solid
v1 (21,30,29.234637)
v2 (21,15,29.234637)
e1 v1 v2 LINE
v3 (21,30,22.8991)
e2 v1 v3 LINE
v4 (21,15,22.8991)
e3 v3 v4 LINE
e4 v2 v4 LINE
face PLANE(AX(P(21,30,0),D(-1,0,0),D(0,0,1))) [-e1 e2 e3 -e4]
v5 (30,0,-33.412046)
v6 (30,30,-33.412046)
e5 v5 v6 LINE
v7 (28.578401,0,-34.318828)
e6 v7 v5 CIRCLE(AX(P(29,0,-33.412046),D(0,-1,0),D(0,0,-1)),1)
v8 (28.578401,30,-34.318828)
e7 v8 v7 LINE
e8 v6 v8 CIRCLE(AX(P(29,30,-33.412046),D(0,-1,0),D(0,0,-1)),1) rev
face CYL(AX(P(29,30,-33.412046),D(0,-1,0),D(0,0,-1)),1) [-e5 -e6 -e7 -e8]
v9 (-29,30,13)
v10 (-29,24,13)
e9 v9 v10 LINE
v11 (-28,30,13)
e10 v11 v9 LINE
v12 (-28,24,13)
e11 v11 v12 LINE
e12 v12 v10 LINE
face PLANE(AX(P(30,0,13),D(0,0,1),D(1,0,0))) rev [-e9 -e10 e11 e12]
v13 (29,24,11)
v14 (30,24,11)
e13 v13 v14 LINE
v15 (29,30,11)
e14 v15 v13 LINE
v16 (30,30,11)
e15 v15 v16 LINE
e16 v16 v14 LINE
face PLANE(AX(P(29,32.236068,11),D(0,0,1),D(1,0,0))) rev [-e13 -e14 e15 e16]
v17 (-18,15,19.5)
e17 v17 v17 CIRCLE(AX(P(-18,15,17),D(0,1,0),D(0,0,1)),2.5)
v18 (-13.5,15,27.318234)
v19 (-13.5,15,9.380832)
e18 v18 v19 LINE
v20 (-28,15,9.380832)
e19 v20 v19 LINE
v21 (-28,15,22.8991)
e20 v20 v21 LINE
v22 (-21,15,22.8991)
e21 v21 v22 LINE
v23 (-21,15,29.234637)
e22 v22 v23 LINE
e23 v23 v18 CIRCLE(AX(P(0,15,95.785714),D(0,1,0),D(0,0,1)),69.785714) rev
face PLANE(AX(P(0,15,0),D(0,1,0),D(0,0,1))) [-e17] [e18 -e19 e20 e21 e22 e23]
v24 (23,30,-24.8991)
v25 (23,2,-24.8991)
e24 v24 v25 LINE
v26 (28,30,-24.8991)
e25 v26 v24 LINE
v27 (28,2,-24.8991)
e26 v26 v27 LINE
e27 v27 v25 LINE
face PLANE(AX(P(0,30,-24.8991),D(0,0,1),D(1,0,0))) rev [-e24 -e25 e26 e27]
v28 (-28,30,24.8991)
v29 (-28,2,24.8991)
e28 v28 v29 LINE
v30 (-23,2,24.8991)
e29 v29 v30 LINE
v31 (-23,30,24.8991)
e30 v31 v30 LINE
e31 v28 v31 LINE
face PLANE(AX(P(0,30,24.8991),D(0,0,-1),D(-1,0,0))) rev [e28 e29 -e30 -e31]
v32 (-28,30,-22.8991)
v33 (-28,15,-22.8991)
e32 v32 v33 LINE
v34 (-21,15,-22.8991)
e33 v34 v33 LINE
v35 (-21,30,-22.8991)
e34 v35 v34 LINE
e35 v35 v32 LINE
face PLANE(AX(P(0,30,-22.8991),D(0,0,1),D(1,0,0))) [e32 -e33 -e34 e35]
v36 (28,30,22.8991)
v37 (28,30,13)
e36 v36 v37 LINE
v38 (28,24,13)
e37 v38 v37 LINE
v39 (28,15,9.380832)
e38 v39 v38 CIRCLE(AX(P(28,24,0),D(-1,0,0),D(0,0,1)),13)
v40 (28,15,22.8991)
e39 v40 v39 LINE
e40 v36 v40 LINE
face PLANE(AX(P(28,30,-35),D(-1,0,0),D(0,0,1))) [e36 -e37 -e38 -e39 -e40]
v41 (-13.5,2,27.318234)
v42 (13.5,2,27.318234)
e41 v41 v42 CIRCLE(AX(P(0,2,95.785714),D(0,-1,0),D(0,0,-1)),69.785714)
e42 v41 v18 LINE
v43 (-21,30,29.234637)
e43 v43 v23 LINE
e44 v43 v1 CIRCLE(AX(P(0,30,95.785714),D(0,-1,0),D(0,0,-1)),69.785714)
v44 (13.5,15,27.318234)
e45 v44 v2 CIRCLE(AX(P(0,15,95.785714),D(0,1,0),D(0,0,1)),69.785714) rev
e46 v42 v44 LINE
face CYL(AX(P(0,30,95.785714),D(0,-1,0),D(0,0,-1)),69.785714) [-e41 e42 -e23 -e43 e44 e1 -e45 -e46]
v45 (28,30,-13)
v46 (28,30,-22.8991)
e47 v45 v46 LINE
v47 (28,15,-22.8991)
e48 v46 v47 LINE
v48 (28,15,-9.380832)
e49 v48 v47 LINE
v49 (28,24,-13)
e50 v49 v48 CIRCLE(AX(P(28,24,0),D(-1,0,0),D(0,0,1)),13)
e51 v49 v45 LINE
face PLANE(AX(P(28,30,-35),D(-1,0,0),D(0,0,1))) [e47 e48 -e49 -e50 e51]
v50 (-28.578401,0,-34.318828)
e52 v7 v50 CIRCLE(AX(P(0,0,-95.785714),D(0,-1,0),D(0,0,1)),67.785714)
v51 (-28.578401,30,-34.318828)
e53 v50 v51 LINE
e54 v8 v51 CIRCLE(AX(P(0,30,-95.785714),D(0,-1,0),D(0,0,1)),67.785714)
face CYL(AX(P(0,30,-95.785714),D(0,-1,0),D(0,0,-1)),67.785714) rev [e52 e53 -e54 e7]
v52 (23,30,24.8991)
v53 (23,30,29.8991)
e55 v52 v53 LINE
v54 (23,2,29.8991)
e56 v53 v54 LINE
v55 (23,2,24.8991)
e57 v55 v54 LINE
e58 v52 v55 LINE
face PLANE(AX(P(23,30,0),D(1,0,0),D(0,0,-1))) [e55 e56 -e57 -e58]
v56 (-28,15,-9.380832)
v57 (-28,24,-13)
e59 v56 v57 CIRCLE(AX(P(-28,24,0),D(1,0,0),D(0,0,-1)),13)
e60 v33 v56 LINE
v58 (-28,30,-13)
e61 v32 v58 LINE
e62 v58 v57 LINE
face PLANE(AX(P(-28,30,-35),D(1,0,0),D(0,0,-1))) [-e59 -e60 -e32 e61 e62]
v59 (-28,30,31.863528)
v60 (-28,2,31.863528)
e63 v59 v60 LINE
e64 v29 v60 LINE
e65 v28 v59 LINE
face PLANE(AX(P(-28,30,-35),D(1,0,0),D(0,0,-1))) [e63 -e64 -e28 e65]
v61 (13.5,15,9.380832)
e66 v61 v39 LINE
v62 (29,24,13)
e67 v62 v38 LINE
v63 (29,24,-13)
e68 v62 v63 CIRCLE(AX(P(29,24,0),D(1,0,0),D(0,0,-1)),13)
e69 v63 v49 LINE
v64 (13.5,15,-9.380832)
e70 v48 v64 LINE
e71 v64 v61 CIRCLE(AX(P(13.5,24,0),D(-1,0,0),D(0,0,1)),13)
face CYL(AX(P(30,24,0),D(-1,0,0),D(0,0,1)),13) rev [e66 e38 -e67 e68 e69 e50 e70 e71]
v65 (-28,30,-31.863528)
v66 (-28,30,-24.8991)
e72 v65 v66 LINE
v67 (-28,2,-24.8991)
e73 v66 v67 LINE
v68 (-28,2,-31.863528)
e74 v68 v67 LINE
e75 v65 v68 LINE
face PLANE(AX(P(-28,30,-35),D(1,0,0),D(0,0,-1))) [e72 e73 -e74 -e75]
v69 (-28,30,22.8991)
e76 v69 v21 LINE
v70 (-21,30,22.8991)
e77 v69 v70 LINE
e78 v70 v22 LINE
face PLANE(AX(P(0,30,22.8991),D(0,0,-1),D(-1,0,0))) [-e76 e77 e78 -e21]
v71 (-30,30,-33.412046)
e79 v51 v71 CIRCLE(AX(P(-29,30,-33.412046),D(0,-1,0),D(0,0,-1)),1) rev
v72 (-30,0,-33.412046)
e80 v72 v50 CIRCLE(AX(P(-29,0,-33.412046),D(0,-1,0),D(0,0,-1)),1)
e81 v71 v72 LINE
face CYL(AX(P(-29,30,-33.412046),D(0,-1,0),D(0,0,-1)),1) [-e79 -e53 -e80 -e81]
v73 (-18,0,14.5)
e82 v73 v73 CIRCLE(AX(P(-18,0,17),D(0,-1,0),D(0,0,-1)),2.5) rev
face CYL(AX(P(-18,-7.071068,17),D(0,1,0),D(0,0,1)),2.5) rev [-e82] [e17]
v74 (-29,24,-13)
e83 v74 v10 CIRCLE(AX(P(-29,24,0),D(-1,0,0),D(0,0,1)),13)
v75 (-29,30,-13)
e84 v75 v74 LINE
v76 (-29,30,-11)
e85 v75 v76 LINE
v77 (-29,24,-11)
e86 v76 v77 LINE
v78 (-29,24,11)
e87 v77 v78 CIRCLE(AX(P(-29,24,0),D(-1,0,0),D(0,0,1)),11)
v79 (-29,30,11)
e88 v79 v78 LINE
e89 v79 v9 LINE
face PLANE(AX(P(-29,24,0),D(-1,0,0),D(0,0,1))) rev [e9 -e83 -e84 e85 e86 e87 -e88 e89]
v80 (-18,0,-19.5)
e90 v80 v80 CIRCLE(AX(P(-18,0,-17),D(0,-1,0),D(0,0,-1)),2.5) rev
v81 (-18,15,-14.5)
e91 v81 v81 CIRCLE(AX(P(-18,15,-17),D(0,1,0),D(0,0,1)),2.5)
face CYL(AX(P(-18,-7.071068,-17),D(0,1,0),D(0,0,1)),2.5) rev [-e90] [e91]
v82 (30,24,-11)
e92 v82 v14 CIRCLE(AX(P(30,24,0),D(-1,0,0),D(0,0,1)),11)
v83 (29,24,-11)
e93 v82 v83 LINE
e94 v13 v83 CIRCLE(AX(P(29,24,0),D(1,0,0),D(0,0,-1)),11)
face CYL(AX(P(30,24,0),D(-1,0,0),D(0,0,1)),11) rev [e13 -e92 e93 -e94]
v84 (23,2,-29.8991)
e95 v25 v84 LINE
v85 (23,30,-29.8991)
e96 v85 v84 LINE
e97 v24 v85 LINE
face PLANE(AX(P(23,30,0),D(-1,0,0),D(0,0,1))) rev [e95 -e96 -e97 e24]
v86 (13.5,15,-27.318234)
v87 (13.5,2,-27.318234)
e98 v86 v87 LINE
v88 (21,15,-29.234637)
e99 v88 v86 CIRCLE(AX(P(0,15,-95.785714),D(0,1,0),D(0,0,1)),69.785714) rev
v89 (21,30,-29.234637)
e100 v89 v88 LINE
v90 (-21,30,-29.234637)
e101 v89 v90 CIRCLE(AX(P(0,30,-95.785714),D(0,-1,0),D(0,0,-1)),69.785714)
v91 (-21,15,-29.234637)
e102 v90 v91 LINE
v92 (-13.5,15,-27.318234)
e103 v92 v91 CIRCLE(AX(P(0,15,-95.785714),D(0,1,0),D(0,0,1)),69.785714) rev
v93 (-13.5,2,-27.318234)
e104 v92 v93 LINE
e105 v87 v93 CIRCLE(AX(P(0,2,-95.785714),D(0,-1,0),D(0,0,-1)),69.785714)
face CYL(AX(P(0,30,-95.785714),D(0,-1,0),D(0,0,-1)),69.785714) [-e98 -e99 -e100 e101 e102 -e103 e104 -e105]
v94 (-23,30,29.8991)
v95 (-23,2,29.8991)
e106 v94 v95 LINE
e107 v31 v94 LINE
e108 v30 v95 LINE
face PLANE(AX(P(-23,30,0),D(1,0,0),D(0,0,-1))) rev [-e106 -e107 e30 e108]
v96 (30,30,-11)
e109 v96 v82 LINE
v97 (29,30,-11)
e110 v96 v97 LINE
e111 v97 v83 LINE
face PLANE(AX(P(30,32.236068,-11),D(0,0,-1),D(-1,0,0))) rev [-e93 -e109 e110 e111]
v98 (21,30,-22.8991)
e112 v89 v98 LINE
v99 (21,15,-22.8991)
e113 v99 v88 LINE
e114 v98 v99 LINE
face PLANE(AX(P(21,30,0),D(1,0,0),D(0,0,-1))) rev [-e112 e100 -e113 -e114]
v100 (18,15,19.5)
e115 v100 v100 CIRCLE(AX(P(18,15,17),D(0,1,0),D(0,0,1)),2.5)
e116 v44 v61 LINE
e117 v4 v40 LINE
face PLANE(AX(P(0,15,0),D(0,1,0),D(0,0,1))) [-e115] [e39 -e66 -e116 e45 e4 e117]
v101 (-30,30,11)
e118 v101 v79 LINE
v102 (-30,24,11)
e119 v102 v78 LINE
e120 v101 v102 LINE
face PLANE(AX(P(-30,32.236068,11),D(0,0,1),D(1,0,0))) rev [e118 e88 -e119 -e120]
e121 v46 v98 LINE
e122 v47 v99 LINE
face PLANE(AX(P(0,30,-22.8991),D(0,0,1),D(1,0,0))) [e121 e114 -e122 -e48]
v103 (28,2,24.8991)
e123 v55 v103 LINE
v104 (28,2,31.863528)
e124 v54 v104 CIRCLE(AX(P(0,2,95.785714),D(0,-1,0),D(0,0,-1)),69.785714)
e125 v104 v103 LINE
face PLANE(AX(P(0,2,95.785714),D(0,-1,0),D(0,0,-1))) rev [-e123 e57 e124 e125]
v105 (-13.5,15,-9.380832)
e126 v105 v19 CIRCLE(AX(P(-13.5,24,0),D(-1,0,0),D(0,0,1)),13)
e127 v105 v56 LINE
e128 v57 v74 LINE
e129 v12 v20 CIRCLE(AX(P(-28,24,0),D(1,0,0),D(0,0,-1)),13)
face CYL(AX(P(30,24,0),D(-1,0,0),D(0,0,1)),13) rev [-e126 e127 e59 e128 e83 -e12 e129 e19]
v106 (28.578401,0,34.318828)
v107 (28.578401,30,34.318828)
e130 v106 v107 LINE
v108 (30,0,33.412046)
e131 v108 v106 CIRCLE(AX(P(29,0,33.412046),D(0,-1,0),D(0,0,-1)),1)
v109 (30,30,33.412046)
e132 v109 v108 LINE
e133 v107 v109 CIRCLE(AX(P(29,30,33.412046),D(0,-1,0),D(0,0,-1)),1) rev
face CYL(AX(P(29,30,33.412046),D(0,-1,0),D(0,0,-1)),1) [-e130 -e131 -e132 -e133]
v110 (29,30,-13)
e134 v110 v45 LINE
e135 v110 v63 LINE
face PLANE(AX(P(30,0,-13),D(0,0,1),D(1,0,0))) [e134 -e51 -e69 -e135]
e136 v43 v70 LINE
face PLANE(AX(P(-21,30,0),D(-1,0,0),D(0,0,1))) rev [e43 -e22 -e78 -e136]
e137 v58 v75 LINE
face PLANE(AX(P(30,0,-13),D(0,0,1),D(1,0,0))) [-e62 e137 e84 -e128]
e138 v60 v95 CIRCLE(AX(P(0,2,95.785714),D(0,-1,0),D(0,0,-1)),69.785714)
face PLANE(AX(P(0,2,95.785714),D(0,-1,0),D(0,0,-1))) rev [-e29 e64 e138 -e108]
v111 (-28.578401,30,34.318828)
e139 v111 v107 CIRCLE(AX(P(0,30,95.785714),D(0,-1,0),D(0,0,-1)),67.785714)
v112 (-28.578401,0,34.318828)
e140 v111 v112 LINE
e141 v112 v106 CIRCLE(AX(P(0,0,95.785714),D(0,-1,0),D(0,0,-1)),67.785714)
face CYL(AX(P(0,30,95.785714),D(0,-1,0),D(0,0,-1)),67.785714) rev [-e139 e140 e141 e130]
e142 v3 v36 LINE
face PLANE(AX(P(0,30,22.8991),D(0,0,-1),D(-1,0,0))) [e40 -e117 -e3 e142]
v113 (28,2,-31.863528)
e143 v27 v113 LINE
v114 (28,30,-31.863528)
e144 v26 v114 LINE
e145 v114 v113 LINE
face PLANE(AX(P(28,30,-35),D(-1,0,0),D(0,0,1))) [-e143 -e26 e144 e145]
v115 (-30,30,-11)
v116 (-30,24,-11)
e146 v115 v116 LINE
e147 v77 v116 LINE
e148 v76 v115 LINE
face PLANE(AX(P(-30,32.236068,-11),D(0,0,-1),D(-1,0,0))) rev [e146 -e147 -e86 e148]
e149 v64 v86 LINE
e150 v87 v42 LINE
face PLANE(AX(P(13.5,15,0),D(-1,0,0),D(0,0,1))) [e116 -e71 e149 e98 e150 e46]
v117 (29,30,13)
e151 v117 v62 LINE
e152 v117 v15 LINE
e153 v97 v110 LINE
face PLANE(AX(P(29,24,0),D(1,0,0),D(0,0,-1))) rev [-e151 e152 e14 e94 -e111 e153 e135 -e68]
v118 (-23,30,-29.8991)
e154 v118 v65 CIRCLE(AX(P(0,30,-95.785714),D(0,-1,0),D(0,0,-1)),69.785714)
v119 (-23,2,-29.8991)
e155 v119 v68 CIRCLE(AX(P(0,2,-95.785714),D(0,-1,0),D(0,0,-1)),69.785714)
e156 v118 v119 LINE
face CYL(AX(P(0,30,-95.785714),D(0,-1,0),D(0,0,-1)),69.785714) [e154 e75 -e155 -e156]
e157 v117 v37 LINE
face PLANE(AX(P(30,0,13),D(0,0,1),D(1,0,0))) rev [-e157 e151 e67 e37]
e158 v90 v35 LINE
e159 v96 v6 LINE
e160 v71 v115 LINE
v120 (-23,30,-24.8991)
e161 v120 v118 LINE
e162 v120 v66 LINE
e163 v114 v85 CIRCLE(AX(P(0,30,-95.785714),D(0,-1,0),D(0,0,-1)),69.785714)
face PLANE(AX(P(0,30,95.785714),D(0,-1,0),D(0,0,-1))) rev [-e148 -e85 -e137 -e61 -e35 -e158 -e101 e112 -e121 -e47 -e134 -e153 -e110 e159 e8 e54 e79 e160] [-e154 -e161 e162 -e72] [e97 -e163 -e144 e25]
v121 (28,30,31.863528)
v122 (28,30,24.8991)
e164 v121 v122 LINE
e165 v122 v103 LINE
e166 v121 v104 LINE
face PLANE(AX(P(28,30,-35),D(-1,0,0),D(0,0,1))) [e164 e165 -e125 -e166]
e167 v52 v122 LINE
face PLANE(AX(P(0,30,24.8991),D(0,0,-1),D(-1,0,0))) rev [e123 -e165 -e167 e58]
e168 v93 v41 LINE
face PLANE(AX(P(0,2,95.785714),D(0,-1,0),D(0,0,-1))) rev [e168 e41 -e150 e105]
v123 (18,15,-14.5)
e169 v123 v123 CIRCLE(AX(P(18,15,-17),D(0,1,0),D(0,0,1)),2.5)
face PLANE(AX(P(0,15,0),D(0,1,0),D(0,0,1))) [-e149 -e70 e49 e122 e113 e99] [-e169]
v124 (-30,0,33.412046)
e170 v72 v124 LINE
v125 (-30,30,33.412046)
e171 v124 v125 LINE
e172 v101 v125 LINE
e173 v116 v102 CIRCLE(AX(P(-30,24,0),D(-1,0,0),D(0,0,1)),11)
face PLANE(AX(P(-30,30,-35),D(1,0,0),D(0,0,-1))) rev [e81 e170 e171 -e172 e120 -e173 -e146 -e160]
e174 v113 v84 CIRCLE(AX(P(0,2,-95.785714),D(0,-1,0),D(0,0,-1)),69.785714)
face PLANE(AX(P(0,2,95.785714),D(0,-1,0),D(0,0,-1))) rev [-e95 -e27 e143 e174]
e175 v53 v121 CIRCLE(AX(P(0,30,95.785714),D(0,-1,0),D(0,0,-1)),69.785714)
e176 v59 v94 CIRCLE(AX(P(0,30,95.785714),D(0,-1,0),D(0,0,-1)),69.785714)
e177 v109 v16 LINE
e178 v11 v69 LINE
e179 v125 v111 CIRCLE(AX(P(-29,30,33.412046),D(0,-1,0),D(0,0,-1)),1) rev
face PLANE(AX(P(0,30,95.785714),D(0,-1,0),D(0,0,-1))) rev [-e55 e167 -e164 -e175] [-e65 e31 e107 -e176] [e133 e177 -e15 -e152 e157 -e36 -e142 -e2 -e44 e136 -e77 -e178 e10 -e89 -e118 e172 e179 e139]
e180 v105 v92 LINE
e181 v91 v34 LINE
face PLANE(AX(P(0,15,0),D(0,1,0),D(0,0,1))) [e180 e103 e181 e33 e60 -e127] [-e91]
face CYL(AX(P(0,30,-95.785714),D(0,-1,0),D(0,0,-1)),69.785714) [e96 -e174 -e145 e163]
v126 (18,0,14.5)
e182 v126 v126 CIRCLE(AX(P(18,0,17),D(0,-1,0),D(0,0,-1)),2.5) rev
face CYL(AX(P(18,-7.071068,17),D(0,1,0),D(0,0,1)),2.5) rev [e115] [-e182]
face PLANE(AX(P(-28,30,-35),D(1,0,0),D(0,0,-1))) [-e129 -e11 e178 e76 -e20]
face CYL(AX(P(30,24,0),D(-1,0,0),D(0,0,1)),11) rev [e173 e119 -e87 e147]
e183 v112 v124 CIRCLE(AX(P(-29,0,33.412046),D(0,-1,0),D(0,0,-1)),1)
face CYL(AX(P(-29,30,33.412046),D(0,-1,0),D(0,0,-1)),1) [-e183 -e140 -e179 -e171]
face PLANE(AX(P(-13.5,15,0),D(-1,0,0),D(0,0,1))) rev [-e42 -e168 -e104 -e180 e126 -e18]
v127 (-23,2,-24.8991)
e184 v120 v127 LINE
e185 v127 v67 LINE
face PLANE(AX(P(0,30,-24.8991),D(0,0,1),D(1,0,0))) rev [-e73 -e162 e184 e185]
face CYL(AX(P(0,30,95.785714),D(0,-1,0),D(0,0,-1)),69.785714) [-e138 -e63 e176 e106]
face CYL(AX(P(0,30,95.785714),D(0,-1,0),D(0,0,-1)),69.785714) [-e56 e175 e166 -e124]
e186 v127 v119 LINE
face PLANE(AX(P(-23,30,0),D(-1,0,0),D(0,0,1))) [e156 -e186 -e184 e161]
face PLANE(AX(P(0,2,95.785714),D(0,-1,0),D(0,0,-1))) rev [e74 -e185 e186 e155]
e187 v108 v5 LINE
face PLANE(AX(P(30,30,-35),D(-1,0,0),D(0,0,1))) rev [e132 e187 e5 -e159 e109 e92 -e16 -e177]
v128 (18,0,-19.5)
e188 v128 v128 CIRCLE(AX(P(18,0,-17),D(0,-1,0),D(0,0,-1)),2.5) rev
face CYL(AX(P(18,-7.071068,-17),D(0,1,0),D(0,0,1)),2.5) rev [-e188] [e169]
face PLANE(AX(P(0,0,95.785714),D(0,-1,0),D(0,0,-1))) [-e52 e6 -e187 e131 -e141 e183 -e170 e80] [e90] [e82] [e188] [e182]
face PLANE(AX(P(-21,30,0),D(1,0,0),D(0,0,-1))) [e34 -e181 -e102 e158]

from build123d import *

# Parameters (mm, degrees)
RESSALTO_EXTRUS_O2_DEPTH = 30
CASCA1_T                 = -2
RESSALTO_EXTRUS_O3_DEPTH = 28
RESSALTO_EXTRUS_O4_DEPTH = 13
CASCA2_START             = 2
CASCA2_DEPTH             = 13
RESSALTO_EXTRUS_O5_DEPTH = 13
RESSALTO_EXTRUS_O6_DEPTH = 13
CORTE_EXTRUS_O1_DEPTH    = 60
RESSALTO_EXTRUS_O7_DEPTH = 1
RESSALTO_EXTRUS_O8_START = -1
RESSALTO_EXTRUS_O8_DEPTH = 1
ESBO_O16_R               = 11
CORTE_EXTRUS_O2_DEPTH    = 60
ESBO_O17_R               = 2.5
CORTE_EXTRUS_O3_DEPTH    = 15
FILETE1_R                = 1
ESBO_O18_W               = 1
ESBO_O18_H               = 2
RESSALTO_EXTRUS_O9_DEPTH = 6


# Read off the part's stored shape, not the designer's step: Casca2, Ressalto-extrusão5, Ressalto-extrusão6
with BuildPart() as part:
    # Esboço2 → Ressalto-extrusão2 (new body)
    with BuildSketch(Plane(origin=(0, 0, 0), x_dir=(1, 0, 0), z_dir=(0, 1, 0))):
        with BuildLine():
            Line((-30, 35), (-30, -35))
            ThreePointArc((-30, -35), (0, -28), (30, -35))
            Line((30, -35), (30, 35))
            ThreePointArc((30, 35), (0, 28), (-30, 35))
        make_face()
    extrude(amount=RESSALTO_EXTRUS_O2_DEPTH)

    # Casca1
    casca1_openings = [part.faces().sort_by_distance(p)[0] for p in [
        (0, 30, 0),
    ]]
    offset(amount=CASCA1_T, openings=casca1_openings, kind=Kind.INTERSECTION)

    # Esboço5 → Ressalto-extrusão3 (add)
    with BuildSketch(Plane(origin=(0, 2, 0), x_dir=(1, 0, 0), z_dir=(0, 1, 0))):
        with BuildLine():
            Line((28, 22.89910018), (28, 24.89910018))
            Line((28, 24.89910018), (23, 24.89910018))
            Line((23, 24.89910018), (23, 29.89910018))
            ThreePointArc((23, 29.89910018), (22.002508446, 29.559318185), (21, 29.234636771))
            Line((21, 29.234636771), (21, 22.89910018))
            Line((21, 22.89910018), (28, 22.89910018))
        make_face()
        with BuildLine():
            ThreePointArc((-23, -29.89910018), (-22.002508446, -29.559318185), (-21, -29.234636771))
            Line((-21, -29.234636771), (-21, -22.89910018))
            Line((-21, -22.89910018), (-28, -22.89910018))
            Line((-28, -22.89910018), (-28, -24.89910018))
            Line((-28, -24.89910018), (-23, -24.89910018))
            Line((-23, -24.89910018), (-23, -29.89910018))
        make_face()
        with BuildLine():
            Line((-21, 22.89910018), (-21, 29.234636771))
            ThreePointArc((-21, 29.234636771), (-22.002508446, 29.559318185), (-23, 29.89910018))
            Line((-23, 29.89910018), (-23, 24.89910018))
            Line((-23, 24.89910018), (-28, 24.89910018))
            Line((-28, 24.89910018), (-28, 22.89910018))
            Line((-28, 22.89910018), (-21, 22.89910018))
        make_face()
        with BuildLine():
            Line((28, -24.89910018), (28, -22.89910018))
            Line((28, -22.89910018), (21, -22.89910018))
            Line((21, -22.89910018), (21, -29.234636771))
            ThreePointArc((21, -29.234636771), (22.002508446, -29.559318185), (23, -29.89910018))
            Line((23, -29.89910018), (23, -24.89910018))
            Line((23, -24.89910018), (28, -24.89910018))
        make_face()
    extrude(amount=RESSALTO_EXTRUS_O3_DEPTH)

    # Esboço6 → Ressalto-extrusão4 (add)
    with BuildSketch(Plane(origin=(0, 2, 0), x_dir=(1, 0, 0), z_dir=(0, 1, 0))):
        with BuildLine():
            Line((-15.5, 27.743110585), (-15.5, -27.743110585))
            ThreePointArc((-15.5, -27.743110585), (0, -26), (15.5, -27.743110585))
            Line((15.5, -27.743110585), (15.5, 27.743110585))
            ThreePointArc((15.5, 27.743110585), (0, 26), (-15.5, 27.743110585))
        make_face()
    extrude(amount=RESSALTO_EXTRUS_O4_DEPTH)

    # Casca2 outline → Casca2 (cut)
    with BuildSketch(Plane(origin=(0, 0, 0), x_dir=(1, 0, 0), z_dir=(0, 1, 0)).offset(CASCA2_START)):
        with BuildLine():
            Line((-13.5, 27.318233549), (-13.5, -27.318233549))
            ThreePointArc((-13.5, -27.318233549), (0, -26), (13.5, -27.318233549))
            Line((13.5, -27.318233549), (13.5, 27.318233549))
            ThreePointArc((13.5, 27.318233549), (0, 26), (-13.5, 27.318233549))
        make_face()
    extrude(amount=CASCA2_DEPTH, mode=Mode.SUBTRACT)

    # Ressalto-extrusão5 outline → Ressalto-extrusão5 (add)
    with BuildSketch(Plane(origin=(0, 2, 0), x_dir=(1, 0, 0), z_dir=(0, 1, 0))):
        with BuildLine():
            Line((15.5, 27.743110585), (15.5, -27.743110585))
            ThreePointArc((15.5, -27.743110585), (18.265230976, -28.432709484), (21, -29.234636771))
            Line((21, -29.234636771), (21, -22.89910018))
            Line((21, -22.89910018), (28, -22.89910018))
            Line((28, -22.89910018), (28, 22.89910018))
            Line((28, 22.89910018), (21, 22.89910018))
            Line((21, 22.89910018), (21, 29.234636771))
            ThreePointArc((21, 29.234636771), (18.265230976, 28.432709484), (15.5, 27.743110585))
        make_face()
    extrude(amount=RESSALTO_EXTRUS_O5_DEPTH)

    # Ressalto-extrusão6 outline → Ressalto-extrusão6 (add)
    with BuildSketch(Plane(origin=(0, 2, 0), x_dir=(1, 0, 0), z_dir=(0, 1, 0))):
        with BuildLine():
            Line((-21, -22.89910018), (-21, -29.234636771))
            ThreePointArc((-21, -29.234636771), (-18.265230976, -28.432709484), (-15.5, -27.743110585))
            Line((-15.5, -27.743110585), (-15.5, 27.743110585))
            ThreePointArc((-15.5, 27.743110585), (-18.265230976, 28.432709484), (-21, 29.234636771))
            Line((-21, 29.234636771), (-21, 22.89910018))
            Line((-21, 22.89910018), (-28, 22.89910018))
            Line((-28, 22.89910018), (-28, -22.89910018))
            Line((-28, -22.89910018), (-21, -22.89910018))
        make_face()
    extrude(amount=RESSALTO_EXTRUS_O6_DEPTH)

    # Esboço9 → Corte-extrusão1 (cut)
    with BuildSketch(Plane.ZY.offset(30)):
        with BuildLine():
            ThreePointArc((-11.532562595, 30), (-12.62781283, 27.088420816), (-13, 24))
            ThreePointArc((-13, 24), (0, 11), (13, 24))
            ThreePointArc((13, 24), (12.62781283, 27.088420816), (11.532562595, 30))
            Line((11.532562595, 30), (-11.532562595, 30))
        make_face()
        with BuildLine():
            ThreePointArc((11.532562595, 30), (0, 37), (-11.532562595, 30))
            Line((-11.532562595, 30), (11.532562595, 30))
        make_face()
        with BuildLine():
            Line((-13, 44), (-13, 30))
            Line((-13, 30), (-11.532562595, 30))
            ThreePointArc((-11.532562595, 30), (0, 37), (11.532562595, 30))
            Line((11.532562595, 30), (13, 30))
            Line((13, 30), (13, 44))
            Line((13, 44), (-13, 44))
        make_face()
        with BuildLine():
            ThreePointArc((11.532562595, 30), (12.62781283, 27.088420816), (13, 24))
            Line((13, 24), (13, 30))
            Line((13, 30), (11.532562595, 30))
        make_face()
        with BuildLine():
            Line((-13, 30), (-13, 24))
            ThreePointArc((-13, 24), (-12.62781283, 27.088420816), (-11.532562595, 30))
            Line((-11.532562595, 30), (-13, 30))
        make_face()
    extrude(amount=-CORTE_EXTRUS_O1_DEPTH, mode=Mode.SUBTRACT)

    # Esboço14 → Ressalto-extrusão7 (add)
    with BuildSketch(Plane.ZY.offset(30)):
        with BuildLine():
            Line((-13, 24), (13, 24))
            ThreePointArc((13, 24), (0, 11), (-13, 24))
        make_face()
    extrude(amount=-RESSALTO_EXTRUS_O7_DEPTH)

    # Esboço15 → Ressalto-extrusão8 (add)
    with BuildSketch(Plane(origin=(30, 0, 0), x_dir=(0, 0, -1), z_dir=(1, 0, 0)).offset(RESSALTO_EXTRUS_O8_START)):
        with BuildLine():
            Line((-13, 24), (13, 24))
            ThreePointArc((13, 24), (0, 11), (-13, 24))
        make_face()
    extrude(amount=RESSALTO_EXTRUS_O8_DEPTH)

    # Esboço16 → Corte-extrusão2 (cut)
    with BuildSketch(Plane.ZY.offset(30)):
        with Locations((0, 24)):
            Circle(ESBO_O16_R)
    extrude(amount=-CORTE_EXTRUS_O2_DEPTH, mode=Mode.SUBTRACT)

    # Esboço17 → Corte-extrusão3 (cut)
    with BuildSketch(Plane(origin=(0, 15, 0), x_dir=(1, 0, 0), z_dir=(0, 1, 0))):
        with Locations(Location((18, 17, 0), (0, 0, 270))):
            Circle(ESBO_O17_R)
        with Locations(Location((-18, -17, 0), (0, 0, 270))):
            Circle(ESBO_O17_R)
        with Locations(Location((18, -17, 0), (0, 0, 270))):
            Circle(ESBO_O17_R)
        with Locations(Location((-18, 17, 0), (0, 0, 270))):
            Circle(ESBO_O17_R)
    extrude(amount=-CORTE_EXTRUS_O3_DEPTH, mode=Mode.SUBTRACT)

    # Filete1
    filete1_edges = [part.edges().sort_by_distance(p)[0] for p in [
        (-30, 15, 35),
        (-30, 15, -35),
        (30, 15, -35),
        (30, 15, 35),
    ]]
    fillet(filete1_edges, radius=FILETE1_R)

    # Esboço18 → Ressalto-extrusão9 (add)
    with BuildSketch(Plane(origin=(0, 24, 0), x_dir=(1, 0, 0), z_dir=(0, 1, 0))):
        with Locations((-29.5, 12)):
            Rectangle(ESBO_O18_W, ESBO_O18_H)
        with Locations((-29.5, -12)):
            Rectangle(ESBO_O18_W, ESBO_O18_H)
        with Locations((29.5, 12)):
            Rectangle(ESBO_O18_W, ESBO_O18_H)
        with Locations((29.5, -12)):
            Rectangle(ESBO_O18_W, ESBO_O18_H)
    extrude(amount=RESSALTO_EXTRUS_O9_DEPTH)


solid = part.part
